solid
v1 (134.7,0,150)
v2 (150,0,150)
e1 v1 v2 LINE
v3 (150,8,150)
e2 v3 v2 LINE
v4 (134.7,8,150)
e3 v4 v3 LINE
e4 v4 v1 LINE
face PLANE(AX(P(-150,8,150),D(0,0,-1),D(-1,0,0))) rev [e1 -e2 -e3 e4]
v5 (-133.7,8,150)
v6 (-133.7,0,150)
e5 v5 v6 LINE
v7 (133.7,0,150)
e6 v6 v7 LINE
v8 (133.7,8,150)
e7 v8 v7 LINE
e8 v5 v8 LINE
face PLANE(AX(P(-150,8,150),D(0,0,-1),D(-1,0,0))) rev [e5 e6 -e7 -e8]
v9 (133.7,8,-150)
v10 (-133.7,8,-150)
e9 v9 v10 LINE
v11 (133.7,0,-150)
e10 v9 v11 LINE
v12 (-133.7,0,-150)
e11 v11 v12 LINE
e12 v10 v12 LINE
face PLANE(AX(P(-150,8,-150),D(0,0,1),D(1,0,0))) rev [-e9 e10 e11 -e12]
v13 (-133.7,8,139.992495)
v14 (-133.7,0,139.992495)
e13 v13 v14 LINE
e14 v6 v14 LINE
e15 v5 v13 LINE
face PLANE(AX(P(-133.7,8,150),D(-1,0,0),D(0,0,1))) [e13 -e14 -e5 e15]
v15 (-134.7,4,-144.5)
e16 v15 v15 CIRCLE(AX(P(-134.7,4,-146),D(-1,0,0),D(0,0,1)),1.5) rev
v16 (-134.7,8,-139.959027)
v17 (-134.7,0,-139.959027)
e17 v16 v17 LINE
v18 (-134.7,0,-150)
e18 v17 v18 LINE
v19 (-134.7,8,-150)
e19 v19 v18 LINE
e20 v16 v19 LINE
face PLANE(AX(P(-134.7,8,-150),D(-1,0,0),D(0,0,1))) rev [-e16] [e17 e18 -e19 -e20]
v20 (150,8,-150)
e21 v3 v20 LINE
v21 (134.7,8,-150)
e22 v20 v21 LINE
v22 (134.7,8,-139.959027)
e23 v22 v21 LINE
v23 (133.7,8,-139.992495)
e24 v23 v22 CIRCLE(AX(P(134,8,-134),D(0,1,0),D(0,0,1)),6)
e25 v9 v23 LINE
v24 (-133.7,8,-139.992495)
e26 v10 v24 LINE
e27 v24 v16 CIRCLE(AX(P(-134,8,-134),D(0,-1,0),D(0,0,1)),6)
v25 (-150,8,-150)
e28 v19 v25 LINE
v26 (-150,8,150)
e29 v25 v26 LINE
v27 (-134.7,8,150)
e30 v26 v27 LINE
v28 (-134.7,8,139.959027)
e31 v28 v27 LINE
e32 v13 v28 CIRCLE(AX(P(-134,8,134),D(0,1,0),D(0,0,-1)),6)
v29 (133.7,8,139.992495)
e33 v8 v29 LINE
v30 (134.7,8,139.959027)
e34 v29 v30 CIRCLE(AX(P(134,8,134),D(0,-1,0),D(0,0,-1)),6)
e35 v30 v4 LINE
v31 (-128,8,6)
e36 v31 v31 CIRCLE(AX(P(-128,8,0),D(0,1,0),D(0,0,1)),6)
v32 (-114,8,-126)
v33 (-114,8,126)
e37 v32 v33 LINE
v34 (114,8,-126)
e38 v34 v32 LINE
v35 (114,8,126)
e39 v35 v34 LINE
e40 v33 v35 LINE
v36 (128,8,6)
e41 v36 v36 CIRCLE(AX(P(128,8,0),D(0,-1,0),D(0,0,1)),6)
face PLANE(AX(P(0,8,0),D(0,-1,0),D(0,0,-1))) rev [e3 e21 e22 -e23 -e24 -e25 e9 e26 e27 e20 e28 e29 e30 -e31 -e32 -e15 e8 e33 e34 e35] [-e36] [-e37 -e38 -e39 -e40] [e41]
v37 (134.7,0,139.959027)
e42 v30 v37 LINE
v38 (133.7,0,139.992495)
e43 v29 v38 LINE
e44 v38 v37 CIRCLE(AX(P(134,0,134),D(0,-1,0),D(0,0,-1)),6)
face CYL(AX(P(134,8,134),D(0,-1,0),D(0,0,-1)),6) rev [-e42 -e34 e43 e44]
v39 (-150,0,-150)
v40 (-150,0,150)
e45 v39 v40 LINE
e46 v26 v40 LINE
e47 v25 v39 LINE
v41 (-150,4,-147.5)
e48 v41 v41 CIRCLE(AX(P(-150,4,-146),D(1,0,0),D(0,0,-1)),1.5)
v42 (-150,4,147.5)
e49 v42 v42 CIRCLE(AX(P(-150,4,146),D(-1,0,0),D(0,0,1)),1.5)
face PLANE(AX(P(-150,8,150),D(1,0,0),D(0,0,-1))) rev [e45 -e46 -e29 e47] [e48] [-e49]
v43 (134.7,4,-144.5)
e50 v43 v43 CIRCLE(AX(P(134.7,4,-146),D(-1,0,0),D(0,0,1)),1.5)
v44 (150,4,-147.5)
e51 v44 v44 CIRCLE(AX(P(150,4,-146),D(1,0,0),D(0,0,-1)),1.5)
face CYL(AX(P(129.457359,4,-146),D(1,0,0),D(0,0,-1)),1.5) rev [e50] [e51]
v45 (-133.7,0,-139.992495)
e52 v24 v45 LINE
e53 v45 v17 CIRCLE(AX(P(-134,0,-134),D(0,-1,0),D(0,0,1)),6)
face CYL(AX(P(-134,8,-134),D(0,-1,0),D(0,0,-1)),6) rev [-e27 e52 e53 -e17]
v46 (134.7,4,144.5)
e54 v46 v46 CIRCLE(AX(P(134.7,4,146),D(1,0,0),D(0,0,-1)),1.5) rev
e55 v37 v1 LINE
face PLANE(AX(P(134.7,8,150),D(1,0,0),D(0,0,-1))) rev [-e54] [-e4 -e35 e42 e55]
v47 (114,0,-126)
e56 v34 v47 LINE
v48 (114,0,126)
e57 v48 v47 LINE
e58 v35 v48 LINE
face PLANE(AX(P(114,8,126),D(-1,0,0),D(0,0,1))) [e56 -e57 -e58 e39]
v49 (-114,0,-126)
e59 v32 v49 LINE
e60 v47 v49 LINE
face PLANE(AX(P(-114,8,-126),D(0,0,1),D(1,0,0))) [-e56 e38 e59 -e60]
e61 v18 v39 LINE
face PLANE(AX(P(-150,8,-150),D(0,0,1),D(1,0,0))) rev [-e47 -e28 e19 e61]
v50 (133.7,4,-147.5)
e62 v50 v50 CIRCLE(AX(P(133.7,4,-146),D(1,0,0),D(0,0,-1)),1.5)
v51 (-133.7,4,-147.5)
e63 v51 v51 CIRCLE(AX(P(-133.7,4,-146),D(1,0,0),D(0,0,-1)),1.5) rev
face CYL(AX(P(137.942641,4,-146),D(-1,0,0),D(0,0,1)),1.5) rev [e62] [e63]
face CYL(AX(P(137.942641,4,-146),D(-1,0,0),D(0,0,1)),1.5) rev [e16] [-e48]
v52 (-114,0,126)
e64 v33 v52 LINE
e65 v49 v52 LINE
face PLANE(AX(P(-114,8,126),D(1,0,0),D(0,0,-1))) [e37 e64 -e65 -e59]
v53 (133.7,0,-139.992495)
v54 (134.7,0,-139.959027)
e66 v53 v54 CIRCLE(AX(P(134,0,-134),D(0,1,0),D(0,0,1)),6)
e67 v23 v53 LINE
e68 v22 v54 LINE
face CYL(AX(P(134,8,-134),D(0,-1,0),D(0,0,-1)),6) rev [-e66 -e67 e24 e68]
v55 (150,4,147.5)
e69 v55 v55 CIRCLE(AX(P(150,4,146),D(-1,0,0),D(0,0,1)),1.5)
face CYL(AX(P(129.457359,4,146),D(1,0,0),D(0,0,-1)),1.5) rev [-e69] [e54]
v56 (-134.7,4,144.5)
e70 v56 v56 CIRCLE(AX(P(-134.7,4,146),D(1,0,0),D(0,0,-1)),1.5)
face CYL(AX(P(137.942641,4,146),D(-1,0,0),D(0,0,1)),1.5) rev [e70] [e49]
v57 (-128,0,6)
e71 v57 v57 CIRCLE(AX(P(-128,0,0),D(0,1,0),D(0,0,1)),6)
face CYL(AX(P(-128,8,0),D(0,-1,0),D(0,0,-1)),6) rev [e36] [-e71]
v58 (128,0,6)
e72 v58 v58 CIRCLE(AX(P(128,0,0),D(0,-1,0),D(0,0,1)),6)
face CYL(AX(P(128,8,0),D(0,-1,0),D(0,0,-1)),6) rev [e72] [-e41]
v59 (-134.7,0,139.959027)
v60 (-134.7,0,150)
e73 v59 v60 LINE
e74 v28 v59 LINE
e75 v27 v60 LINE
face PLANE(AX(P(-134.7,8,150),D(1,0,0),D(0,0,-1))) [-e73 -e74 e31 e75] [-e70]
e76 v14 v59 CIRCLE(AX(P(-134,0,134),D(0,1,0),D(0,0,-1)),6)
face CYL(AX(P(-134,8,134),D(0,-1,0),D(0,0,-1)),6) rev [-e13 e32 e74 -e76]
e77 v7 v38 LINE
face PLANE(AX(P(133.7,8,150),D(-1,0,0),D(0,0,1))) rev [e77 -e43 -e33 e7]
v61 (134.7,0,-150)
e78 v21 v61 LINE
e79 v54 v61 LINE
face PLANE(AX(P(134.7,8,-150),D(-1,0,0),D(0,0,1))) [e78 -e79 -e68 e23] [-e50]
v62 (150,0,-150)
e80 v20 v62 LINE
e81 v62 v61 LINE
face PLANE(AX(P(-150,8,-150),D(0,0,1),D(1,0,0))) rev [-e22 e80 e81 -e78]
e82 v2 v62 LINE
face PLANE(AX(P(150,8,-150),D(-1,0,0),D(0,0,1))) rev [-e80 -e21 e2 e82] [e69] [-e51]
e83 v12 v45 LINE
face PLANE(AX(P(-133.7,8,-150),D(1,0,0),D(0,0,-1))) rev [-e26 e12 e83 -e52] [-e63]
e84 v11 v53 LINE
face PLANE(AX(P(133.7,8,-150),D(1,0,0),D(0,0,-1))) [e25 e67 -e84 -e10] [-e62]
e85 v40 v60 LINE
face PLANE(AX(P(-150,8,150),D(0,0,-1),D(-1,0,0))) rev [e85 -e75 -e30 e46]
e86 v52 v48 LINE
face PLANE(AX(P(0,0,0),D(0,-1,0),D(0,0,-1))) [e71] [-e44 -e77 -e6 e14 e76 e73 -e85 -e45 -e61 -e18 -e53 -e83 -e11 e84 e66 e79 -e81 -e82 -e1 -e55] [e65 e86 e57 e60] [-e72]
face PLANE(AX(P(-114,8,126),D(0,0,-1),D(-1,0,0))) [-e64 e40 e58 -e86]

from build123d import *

# Parameters (mm, degrees)
SKETCH1_W           = 300
SKETCH1_H           = 300
SKETCH1_W_2         = 228
SKETCH1_H_2         = 252
BOSS_EXTRUDE1_DEPTH = 8
CUT_EXTRUDE1_DEPTH  = 213.282830205
CUT_EXTRUDE2_START  = -15.3
SKETCH3_R           = 1.5
CUT_EXTRUDE2_DEPTH  = 15.3
MIRROR4_START       = -151
MIRROR4_OUTLINE_R   = 1.5
MIRROR4_DEPTH       = 284.7
MIRROR4_2_OUTLINE_R = 1.5
MIRROR4_2_DEPTH     = 17.3
MIRROR4_START_2     = -1
MIRROR4_3_DEPTH     = 10
SKETCH4_R           = 6
CUT_EXTRUDE3_DEPTH  = 213.282830205


with BuildPart() as part:
    # Sketch1 → Boss-Extrude1 (new body)
    with BuildSketch(Plane(origin=(0, 0, 0), x_dir=(1, 0, 0), z_dir=(0, 1, 0))):
        Rectangle(SKETCH1_W, SKETCH1_H)
        Rectangle(SKETCH1_W_2, SKETCH1_H_2, mode=Mode.SUBTRACT)
    extrude(amount=BOSS_EXTRUDE1_DEPTH)

    # Sketch2 → Cut-Extrude1 (cut, through all)
    with BuildSketch(Plane(origin=(0, 0, 0), x_dir=(1, 0, 0), z_dir=(0, 1, 0))):
        with BuildLine():
            Line((133.7, 150), (134.7, 150))
            Line((134.7, 150), (134.7, 139.959026766))
            ThreePointArc((134.7, 139.959026766), (133.799301132, 128.003357609), (133.7, 139.992495307))
            Line((133.7, 139.992495307), (133.7, 150))
        make_face()
    cut_extrude1 = extrude(amount=CUT_EXTRUDE1_DEPTH, mode=Mode.SUBTRACT)

    # Sketch3 → Cut-Extrude2 (cut)
    with BuildSketch(Plane(origin=(150, 0, 0), x_dir=(0, 0, -1), z_dir=(1, 0, 0)).offset(CUT_EXTRUDE2_START)):
        with Locations((146, 4)):
            Circle(SKETCH3_R)
    cut_extrude2 = extrude(amount=CUT_EXTRUDE2_DEPTH, mode=Mode.SUBTRACT)

    # Mirror3: Cut-Extrude1, Cut-Extrude2 across plane
    add(cut_extrude1.mirror(Plane.XY), mode=Mode.SUBTRACT)
    add(cut_extrude2.mirror(Plane.XY), mode=Mode.SUBTRACT)

    # Mirror4: read off the stored shape, not the designer's step
    # Mirror4 outline → Mirror4 (cut)
    with BuildSketch(Plane.YZ.offset(MIRROR4_START)):
        with Locations((4, -146)):
            Circle(MIRROR4_OUTLINE_R)
    extrude(amount=MIRROR4_DEPTH, mode=Mode.SUBTRACT)

    # Mirror4 2 outline → Mirror4 2 (cut)
    with BuildSketch(Plane.YZ.offset(MIRROR4_START)):
        with Locations((4, 146)):
            Circle(MIRROR4_2_OUTLINE_R)
    extrude(amount=MIRROR4_2_DEPTH, mode=Mode.SUBTRACT)

    # Mirror4 3 outline → Mirror4 3 (cut)
    with BuildSketch(Plane(origin=(0, 0, 0), x_dir=(1, 0, 0), z_dir=(0, 1, 0)).offset(MIRROR4_START_2)):
        with BuildLine():
            ThreePointArc((-134.7, 139.959026766), (-133.799301125, 128.003357609), (-133.7, 139.992495307))
            Line((-133.7, 139.992495307), (-133.7, 150))
            Line((-133.7, 150), (-134.7, 150))
            Line((-134.7, 150), (-134.7, 139.959026766))
        make_face()
        with BuildLine():
            Line((-133.7, -150), (-133.7, -139.992495307))
            ThreePointArc((-133.7, -139.992495307), (-133.799301125, -128.003357609), (-134.7, -139.959026766))
            Line((-134.7, -139.959026766), (-134.7, -150))
            Line((-134.7, -150), (-133.7, -150))
        make_face()
    extrude(amount=MIRROR4_3_DEPTH, mode=Mode.SUBTRACT)

    # Sketch4 → Cut-Extrude3 (cut, through all)
    with BuildSketch(Plane(origin=(0, 0, 0), x_dir=(1, 0, 0), z_dir=(0, 1, 0))):
        with Locations(Location((-128, 0, 0), (0, 0, 270))):
            Circle(SKETCH4_R)
    cut_extrude3 = extrude(amount=CUT_EXTRUDE3_DEPTH, mode=Mode.SUBTRACT)

    # Mirror5: Cut-Extrude3 across plane
    add(cut_extrude3.mirror(Plane(origin=(0, 0, 0), x_dir=(0, 0, 1), z_dir=(1, 0, 0))), mode=Mode.SUBTRACT)


solid = part.part
